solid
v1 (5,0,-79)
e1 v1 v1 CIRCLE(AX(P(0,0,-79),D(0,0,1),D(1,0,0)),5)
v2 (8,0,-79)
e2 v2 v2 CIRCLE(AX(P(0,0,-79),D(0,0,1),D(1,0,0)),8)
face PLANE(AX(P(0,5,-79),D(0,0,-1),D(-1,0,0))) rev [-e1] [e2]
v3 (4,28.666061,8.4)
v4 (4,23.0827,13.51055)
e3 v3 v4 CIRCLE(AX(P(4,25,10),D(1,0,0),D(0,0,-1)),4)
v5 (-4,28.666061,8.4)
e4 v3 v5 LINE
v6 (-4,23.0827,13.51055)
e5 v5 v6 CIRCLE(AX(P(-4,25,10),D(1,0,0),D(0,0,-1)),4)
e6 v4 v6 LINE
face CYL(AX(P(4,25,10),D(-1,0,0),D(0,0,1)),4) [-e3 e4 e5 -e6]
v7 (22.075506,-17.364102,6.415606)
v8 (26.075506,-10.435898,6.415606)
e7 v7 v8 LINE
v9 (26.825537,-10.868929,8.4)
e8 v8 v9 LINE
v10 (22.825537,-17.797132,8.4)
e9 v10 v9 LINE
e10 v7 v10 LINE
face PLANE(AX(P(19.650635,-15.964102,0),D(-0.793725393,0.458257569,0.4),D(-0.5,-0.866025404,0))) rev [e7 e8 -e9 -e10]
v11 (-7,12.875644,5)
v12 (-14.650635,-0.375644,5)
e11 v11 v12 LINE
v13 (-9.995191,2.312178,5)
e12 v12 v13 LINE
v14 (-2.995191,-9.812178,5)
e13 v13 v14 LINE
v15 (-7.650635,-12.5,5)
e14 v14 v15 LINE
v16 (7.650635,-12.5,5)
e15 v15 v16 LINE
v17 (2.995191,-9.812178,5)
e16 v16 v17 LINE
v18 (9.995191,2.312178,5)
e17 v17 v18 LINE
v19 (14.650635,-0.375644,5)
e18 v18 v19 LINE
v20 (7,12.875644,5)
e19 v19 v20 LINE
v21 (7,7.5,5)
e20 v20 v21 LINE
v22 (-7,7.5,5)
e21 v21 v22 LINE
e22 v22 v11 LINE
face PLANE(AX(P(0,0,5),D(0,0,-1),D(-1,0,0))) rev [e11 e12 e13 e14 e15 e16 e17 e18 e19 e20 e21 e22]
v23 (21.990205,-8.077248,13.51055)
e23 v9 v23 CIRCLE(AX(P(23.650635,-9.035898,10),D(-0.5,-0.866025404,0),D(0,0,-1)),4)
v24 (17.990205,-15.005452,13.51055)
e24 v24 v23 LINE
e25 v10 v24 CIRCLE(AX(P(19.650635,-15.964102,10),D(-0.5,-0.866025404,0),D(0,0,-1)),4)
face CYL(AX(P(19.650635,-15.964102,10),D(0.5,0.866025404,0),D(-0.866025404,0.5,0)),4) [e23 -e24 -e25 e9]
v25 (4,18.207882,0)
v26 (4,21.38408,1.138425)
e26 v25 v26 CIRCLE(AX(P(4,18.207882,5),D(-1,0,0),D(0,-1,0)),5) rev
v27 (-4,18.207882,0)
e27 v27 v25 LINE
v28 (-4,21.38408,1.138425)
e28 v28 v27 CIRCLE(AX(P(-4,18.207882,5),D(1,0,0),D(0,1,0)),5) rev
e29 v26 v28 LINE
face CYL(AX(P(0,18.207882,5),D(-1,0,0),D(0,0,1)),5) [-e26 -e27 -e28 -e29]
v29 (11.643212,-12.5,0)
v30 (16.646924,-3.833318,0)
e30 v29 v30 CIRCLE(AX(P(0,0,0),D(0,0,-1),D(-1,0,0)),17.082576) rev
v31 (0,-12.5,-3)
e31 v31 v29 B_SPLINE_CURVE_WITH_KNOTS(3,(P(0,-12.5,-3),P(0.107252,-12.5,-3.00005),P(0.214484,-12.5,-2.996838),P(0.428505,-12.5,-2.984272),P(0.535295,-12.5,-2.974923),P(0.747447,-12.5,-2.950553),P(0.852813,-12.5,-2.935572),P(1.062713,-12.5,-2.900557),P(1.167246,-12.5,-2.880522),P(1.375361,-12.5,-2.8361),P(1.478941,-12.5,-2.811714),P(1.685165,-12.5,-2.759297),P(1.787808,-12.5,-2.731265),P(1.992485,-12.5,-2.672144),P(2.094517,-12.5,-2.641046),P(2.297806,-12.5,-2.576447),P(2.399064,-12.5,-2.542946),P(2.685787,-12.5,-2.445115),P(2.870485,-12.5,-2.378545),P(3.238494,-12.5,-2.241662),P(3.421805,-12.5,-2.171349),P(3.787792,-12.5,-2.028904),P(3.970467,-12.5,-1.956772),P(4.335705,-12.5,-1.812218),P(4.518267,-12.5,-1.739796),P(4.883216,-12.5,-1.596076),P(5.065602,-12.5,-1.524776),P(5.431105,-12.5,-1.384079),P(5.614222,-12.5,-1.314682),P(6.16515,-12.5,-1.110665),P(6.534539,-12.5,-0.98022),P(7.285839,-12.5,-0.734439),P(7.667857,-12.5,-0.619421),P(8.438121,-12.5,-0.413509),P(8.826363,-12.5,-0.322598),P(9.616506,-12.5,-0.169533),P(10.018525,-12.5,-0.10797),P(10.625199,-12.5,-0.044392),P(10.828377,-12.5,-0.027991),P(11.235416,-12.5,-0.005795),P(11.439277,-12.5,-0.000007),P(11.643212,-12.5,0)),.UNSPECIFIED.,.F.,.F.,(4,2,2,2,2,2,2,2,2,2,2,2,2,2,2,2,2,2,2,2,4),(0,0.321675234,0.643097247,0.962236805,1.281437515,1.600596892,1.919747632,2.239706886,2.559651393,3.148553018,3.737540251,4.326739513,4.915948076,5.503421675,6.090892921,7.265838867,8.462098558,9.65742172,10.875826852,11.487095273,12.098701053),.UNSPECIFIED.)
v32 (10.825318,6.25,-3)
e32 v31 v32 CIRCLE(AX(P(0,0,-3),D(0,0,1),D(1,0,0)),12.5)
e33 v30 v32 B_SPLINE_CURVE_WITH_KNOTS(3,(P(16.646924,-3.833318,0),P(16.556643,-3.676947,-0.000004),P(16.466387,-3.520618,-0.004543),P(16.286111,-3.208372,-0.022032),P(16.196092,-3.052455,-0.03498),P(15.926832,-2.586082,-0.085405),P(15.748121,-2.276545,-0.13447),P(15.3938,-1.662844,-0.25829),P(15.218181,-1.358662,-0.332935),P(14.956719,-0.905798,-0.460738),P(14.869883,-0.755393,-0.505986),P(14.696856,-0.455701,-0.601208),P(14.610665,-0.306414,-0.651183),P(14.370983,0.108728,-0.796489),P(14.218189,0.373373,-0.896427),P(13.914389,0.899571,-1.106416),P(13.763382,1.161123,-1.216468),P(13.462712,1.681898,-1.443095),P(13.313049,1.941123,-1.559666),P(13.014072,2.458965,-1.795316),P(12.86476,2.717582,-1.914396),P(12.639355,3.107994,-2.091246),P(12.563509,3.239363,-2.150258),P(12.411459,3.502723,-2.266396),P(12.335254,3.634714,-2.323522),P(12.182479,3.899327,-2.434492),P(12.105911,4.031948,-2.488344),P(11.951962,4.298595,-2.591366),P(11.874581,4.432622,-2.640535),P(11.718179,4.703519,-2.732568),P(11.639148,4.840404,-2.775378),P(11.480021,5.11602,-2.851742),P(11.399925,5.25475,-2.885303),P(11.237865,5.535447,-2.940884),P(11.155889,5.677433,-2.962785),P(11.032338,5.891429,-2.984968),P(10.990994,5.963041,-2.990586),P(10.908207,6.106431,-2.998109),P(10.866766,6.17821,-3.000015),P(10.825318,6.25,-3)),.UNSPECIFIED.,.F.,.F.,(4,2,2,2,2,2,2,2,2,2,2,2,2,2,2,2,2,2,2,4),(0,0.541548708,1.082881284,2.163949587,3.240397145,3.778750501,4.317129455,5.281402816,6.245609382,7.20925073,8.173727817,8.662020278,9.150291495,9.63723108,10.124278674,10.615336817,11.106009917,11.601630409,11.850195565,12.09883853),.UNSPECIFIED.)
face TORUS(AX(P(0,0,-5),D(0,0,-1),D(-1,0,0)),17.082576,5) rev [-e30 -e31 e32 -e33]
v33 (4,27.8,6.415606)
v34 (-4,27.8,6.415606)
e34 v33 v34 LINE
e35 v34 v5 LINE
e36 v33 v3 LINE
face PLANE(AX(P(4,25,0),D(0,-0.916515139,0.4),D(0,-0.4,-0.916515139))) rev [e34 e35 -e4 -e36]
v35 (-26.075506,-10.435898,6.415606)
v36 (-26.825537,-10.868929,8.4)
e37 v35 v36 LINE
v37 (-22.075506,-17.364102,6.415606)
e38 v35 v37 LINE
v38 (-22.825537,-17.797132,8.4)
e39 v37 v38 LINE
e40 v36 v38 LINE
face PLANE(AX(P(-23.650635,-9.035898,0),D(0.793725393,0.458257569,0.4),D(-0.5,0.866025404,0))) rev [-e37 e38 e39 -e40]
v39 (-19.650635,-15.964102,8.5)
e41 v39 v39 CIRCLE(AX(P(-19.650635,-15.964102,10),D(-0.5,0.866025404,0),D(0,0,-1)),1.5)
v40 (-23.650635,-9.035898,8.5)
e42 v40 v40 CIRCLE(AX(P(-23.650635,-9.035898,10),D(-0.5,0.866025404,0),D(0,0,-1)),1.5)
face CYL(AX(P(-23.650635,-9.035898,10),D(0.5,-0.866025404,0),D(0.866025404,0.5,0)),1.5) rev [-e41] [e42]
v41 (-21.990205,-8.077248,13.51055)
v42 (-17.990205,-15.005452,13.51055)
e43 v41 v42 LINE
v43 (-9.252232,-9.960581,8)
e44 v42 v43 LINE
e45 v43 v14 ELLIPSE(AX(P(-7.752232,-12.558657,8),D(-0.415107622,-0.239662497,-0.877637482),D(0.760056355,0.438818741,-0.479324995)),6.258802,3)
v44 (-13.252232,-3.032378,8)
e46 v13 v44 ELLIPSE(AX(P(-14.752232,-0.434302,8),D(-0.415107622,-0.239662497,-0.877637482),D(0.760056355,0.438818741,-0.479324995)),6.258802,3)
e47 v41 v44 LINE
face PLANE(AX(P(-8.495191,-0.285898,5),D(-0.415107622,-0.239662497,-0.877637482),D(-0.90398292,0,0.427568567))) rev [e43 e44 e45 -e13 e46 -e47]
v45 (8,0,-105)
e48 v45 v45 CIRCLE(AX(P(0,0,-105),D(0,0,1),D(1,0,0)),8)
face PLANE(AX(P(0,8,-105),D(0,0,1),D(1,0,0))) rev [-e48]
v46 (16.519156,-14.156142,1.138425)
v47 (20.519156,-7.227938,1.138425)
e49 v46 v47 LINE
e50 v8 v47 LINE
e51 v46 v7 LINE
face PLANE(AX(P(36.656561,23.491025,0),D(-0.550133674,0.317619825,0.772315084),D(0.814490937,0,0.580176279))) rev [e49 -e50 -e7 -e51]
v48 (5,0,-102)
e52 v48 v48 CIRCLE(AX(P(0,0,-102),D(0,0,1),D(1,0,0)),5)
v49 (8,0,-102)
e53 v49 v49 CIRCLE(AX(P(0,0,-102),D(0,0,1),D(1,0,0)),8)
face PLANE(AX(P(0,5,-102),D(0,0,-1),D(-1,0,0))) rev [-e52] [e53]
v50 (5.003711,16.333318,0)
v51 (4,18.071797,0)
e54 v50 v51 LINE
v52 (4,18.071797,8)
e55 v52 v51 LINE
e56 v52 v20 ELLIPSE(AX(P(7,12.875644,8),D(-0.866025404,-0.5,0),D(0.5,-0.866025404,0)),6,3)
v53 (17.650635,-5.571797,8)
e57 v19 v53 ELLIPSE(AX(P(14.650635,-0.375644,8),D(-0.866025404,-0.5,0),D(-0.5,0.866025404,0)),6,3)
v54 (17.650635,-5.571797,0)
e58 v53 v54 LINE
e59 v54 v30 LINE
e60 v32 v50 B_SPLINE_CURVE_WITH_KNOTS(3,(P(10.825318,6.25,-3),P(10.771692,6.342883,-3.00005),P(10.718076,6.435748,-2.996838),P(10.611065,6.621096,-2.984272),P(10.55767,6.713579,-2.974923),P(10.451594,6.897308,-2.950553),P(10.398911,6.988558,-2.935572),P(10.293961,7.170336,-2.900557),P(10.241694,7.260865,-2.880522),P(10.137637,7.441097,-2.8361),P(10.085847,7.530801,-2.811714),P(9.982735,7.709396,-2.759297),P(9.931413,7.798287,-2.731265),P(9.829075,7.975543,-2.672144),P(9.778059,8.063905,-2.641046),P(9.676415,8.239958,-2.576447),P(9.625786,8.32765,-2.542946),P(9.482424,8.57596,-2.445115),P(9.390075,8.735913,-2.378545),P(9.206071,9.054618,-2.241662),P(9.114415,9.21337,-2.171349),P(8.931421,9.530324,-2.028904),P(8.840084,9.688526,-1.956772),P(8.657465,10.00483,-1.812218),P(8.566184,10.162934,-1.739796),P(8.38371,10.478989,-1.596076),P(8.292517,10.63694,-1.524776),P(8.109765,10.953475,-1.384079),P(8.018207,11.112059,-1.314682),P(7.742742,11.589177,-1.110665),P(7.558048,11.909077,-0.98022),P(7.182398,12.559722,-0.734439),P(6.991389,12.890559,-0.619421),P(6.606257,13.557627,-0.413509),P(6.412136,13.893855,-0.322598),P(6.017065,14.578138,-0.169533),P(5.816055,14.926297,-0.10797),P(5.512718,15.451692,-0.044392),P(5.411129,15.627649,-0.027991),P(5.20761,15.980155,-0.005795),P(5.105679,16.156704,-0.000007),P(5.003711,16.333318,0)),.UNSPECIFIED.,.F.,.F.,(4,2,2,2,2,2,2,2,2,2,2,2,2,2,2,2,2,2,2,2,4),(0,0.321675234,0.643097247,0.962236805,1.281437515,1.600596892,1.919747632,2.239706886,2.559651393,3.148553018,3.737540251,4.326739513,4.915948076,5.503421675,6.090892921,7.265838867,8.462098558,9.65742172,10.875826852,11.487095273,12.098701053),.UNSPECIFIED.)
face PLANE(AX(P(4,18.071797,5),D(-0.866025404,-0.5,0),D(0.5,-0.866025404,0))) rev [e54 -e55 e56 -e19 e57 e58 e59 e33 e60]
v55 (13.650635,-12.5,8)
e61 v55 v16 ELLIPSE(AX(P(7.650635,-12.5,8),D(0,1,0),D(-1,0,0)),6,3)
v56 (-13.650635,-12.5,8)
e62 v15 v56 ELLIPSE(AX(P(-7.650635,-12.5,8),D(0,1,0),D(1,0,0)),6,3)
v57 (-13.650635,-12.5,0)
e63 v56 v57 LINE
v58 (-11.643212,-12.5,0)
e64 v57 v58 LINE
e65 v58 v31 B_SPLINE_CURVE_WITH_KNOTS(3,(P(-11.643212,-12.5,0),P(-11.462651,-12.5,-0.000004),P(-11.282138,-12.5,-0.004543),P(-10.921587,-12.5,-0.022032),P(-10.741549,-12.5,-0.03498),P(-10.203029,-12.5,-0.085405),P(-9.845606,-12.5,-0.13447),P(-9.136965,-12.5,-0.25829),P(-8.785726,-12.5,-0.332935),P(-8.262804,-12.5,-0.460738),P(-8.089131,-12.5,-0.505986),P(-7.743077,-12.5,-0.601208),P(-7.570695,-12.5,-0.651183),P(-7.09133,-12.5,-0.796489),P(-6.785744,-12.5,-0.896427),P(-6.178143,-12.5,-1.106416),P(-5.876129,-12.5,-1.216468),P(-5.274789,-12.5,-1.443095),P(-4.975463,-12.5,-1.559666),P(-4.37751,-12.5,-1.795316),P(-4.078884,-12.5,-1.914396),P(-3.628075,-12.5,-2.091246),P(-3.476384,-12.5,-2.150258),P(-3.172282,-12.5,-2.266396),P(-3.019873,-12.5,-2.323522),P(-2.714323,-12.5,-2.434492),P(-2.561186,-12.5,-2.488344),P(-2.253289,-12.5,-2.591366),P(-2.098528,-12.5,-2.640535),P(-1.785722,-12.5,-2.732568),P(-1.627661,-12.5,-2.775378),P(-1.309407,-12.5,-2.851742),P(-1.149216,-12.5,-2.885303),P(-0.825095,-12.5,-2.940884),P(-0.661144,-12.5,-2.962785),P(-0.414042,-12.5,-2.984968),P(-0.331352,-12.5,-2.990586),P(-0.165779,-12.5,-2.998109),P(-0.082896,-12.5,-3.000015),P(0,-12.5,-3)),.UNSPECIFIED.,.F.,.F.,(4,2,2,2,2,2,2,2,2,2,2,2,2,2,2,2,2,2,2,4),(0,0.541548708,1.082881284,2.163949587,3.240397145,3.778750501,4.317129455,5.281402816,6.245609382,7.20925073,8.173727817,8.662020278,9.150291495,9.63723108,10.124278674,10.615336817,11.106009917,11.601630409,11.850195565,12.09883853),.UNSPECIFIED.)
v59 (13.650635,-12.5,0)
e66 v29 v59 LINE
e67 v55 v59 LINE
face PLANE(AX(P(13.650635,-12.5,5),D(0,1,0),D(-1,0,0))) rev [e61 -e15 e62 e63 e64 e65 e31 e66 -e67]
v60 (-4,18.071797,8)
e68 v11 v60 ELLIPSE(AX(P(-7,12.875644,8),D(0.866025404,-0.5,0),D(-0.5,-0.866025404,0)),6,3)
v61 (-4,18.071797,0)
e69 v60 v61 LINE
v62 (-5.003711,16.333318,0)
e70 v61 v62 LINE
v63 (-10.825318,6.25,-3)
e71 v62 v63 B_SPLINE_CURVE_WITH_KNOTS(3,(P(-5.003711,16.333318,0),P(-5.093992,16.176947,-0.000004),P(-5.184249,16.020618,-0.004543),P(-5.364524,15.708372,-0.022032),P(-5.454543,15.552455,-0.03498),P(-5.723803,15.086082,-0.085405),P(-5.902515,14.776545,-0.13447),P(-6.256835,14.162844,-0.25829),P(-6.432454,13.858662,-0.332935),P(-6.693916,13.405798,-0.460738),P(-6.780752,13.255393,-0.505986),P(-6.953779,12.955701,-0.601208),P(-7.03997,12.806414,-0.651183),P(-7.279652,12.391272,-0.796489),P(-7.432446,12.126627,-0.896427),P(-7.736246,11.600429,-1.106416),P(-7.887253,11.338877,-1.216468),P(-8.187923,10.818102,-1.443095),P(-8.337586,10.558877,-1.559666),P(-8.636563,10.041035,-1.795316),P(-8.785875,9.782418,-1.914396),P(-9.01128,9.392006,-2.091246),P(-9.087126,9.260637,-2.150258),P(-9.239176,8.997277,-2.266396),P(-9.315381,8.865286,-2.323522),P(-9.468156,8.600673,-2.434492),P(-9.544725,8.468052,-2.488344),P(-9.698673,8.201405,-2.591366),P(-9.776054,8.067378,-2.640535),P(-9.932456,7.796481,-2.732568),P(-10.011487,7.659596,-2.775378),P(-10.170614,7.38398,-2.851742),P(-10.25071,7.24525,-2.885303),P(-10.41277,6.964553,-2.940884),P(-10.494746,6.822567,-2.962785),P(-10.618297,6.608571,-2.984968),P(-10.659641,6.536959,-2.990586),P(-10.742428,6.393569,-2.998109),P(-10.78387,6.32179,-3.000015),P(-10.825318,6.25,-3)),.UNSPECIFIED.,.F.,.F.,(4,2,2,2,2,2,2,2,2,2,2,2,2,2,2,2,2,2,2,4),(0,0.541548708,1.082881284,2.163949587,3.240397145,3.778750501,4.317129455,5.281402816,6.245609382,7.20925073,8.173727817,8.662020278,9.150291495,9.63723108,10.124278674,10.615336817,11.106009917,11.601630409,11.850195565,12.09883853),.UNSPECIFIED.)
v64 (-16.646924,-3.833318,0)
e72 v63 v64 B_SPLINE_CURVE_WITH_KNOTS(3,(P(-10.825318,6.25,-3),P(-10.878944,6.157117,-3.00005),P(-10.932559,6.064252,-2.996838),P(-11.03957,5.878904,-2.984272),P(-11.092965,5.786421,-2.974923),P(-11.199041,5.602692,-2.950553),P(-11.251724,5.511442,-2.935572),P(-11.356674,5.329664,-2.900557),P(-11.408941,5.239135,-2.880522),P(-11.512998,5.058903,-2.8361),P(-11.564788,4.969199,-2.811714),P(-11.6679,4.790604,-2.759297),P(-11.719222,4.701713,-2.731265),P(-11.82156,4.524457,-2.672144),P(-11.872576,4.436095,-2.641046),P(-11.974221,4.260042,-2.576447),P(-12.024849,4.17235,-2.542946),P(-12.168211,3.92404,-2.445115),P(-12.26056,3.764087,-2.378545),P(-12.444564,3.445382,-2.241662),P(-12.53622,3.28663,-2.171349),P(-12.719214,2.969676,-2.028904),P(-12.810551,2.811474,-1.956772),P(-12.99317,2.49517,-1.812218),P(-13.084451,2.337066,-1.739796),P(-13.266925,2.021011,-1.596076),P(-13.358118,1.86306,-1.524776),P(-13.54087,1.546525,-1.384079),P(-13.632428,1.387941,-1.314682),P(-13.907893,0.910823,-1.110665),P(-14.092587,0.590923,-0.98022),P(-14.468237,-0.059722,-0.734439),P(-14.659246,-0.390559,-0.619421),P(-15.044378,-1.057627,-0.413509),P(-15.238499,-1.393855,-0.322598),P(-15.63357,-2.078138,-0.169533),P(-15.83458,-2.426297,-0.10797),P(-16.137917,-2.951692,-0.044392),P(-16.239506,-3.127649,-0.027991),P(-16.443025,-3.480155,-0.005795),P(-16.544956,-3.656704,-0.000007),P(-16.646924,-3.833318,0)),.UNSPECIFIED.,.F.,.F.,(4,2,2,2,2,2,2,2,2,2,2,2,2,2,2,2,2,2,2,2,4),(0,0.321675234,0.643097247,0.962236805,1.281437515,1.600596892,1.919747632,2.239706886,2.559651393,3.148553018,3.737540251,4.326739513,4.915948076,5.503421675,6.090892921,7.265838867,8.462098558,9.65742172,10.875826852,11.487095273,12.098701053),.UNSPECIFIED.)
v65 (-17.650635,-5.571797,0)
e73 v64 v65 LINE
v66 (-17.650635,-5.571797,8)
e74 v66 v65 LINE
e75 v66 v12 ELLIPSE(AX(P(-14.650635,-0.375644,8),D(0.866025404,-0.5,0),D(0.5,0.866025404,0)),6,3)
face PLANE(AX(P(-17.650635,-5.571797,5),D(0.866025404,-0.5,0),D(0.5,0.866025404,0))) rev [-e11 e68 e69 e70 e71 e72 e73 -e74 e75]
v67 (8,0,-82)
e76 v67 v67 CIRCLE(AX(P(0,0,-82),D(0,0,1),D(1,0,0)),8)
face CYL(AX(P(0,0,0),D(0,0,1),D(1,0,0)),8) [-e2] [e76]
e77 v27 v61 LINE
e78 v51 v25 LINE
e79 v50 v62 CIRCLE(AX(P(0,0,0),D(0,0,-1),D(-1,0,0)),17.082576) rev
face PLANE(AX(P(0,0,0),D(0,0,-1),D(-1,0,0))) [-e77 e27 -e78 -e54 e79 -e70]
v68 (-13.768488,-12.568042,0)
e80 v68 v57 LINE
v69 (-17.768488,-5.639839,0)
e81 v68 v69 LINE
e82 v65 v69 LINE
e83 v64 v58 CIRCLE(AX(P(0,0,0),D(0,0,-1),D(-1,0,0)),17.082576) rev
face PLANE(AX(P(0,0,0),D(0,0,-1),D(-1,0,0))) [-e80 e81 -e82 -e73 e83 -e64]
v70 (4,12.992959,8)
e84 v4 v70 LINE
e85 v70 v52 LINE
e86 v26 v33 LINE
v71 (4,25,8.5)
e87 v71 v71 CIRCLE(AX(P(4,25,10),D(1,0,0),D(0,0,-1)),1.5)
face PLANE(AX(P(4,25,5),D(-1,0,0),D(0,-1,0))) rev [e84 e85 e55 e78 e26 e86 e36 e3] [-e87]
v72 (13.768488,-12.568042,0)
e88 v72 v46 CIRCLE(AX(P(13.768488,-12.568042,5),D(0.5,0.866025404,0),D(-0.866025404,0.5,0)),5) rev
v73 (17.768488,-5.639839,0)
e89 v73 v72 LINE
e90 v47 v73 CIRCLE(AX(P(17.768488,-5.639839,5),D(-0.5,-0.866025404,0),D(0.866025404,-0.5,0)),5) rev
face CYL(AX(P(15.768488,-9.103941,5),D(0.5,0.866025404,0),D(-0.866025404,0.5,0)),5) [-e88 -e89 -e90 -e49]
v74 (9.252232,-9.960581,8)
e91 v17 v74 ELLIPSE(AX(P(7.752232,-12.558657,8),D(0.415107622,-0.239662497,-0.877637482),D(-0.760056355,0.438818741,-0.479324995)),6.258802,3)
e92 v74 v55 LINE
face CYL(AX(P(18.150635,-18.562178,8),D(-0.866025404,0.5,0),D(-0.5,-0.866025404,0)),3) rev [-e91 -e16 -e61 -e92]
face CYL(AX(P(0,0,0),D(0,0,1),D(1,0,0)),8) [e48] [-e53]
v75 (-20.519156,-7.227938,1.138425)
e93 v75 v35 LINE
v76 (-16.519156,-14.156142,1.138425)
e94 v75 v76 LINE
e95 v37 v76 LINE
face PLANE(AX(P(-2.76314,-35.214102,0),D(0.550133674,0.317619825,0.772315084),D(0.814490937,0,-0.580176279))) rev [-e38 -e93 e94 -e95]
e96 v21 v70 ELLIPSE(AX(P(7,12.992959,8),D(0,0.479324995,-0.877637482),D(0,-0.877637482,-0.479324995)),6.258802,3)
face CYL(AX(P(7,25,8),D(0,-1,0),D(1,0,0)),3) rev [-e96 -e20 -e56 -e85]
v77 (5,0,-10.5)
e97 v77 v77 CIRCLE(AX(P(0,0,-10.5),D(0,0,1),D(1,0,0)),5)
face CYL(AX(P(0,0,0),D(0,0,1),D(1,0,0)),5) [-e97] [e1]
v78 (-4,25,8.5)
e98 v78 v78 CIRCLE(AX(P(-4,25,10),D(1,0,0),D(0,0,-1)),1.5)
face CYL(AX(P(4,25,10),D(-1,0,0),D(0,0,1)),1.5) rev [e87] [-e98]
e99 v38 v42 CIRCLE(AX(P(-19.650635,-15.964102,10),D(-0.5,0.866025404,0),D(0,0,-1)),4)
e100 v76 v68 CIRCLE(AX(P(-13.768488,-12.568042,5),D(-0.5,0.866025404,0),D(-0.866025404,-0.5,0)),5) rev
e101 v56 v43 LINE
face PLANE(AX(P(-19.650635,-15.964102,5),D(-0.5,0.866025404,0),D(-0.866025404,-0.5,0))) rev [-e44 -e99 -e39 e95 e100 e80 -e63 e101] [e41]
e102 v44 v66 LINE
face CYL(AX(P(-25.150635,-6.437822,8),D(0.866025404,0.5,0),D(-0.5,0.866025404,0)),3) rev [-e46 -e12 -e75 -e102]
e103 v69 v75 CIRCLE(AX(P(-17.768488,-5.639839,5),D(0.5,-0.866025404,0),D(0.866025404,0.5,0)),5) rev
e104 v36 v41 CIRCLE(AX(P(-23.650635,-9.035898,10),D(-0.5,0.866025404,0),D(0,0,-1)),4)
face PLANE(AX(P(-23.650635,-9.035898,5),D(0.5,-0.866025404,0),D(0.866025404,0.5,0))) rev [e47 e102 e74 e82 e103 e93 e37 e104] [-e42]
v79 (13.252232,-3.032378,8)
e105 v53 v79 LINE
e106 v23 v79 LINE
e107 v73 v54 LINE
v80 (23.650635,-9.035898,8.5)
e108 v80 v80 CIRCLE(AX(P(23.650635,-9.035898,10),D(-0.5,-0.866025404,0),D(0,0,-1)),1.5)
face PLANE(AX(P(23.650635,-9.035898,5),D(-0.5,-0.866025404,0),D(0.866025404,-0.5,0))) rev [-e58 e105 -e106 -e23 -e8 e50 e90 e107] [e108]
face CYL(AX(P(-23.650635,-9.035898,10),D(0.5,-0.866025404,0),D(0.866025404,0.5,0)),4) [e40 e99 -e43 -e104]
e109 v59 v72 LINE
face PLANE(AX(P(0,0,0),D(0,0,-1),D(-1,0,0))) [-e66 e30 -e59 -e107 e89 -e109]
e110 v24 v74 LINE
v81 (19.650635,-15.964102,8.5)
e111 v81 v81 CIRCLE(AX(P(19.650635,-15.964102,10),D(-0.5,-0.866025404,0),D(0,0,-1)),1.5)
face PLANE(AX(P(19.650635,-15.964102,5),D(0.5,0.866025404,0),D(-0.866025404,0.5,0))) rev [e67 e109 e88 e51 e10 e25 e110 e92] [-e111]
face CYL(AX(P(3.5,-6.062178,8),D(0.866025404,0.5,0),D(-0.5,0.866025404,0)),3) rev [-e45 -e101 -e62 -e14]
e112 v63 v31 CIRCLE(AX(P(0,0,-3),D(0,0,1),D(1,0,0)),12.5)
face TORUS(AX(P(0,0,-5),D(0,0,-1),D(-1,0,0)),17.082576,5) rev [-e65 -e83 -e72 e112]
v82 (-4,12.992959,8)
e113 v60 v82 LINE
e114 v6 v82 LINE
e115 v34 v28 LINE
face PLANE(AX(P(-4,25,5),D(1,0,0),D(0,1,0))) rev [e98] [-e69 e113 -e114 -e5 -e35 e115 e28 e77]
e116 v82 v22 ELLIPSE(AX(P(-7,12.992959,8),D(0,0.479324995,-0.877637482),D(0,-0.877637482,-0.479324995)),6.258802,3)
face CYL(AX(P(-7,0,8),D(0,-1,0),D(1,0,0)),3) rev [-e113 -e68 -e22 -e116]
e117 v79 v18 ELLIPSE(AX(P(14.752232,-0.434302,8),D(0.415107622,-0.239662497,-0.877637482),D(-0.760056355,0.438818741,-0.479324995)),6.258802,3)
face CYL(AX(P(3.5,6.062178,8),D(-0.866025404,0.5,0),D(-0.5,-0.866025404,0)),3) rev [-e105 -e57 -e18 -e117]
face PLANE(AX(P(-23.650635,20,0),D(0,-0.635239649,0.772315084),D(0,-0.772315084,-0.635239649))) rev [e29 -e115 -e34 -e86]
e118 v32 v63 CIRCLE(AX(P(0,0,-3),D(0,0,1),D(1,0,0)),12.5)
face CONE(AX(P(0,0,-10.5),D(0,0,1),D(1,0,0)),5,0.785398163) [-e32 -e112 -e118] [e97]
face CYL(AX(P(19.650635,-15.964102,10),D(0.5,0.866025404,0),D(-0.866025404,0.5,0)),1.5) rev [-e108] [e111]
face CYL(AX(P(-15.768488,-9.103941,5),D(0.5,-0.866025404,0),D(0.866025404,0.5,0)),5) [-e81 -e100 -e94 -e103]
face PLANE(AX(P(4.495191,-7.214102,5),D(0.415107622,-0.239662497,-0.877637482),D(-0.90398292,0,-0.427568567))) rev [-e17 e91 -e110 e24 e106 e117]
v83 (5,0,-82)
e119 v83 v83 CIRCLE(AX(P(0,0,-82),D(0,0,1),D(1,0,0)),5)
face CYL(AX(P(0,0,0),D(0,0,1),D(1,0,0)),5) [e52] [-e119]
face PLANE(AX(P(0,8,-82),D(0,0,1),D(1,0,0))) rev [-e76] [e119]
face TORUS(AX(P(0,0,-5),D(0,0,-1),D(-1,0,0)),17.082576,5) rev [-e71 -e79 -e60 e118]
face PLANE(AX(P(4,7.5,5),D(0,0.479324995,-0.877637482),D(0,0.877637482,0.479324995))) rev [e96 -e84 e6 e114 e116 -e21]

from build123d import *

# Parameters (mm, degrees)
EXTRUDE_1_DEPTH          = 5
SKETCH_3_R               = 1.5
EXTRUDE_2_DEPTH          = 4
CUT_EXTRUDE_1_DEPTH      = 112.469065397
PATTERN_CIRCULAR_1_COUNT = 3
FILLET_1_R               = 3
FILLET_2_R               = 5


with BuildPart() as part:
    # 草图1 → 旋转1 (revolve)
    with BuildSketch(Plane(origin=(0, 0, 0), x_dir=(0, 0, -1), z_dir=(1, 0, 0)), mode=Mode.PRIVATE) as revolve_1_sk:
        Polygon((0, 0), (0, 12.5), (3, 12.5), (10.5, 5), (79, 5), (79, 8), (82, 8), (82, 5), (102, 5), (102, 8), (105, 8), (105, 0), align=None)
    revolve(revolve_1_sk.sketch.rotate(Axis((0, 0, 0), (0, 0, -1)), 90), axis=Axis((0, 0, 0), (0, 0, -1)))

    # 草图2 → 凸台-拉伸1 (add)
    with BuildSketch(Plane.XY):
        Polygon((-4, 25), (4, 25), (4, 18.07179677), (17.650635095, -5.57179677), (23.650635095, -9.035898385), (19.650635095, -15.964101615), (13.650635095, -12.5), (-13.650635095, -12.5), (-19.650635095, -15.964101615), (-23.650635095, -9.035898385), (-17.650635095, -5.57179677), (-4, 18.07179677), align=None)
    extrude(amount=EXTRUDE_1_DEPTH)

    # 草图3 → 凸台-拉伸2 (add, symmetric)
    with BuildSketch(Plane(origin=(0, 0, 0), x_dir=(0, 0, -1), z_dir=(1, 0, 0))):
        with BuildLine():
            Line((-5, 7.5), (-13.510549927, 23.082700021))
            ThreePointArc((-13.510549927, 23.082700021), (-12.95059807, 27.700735275), (-8.4, 28.666060556))
            Line((-8.4, 28.666060556), (0, 25))
            Line((0, 25), (-5, 25))
            Line((-5, 25), (-5, 7.5))
        make_face()
        with Locations((-10, 25)):
            Circle(SKETCH_3_R, mode=Mode.SUBTRACT)
    extrude_2 = extrude(amount=EXTRUDE_2_DEPTH, both=True)

    # 草图5 → 切除-拉伸1 (cut, symmetric)
    with BuildSketch(Plane(origin=(0, 0, 0), x_dir=(0, 0, -1), z_dir=(1, 0, 0))):
        Polygon((0, 20), (-6.415605973, 27.8), (0, 25), align=None)
    cut_extrude_1 = extrude(amount=CUT_EXTRUDE_1_DEPTH, both=True, mode=Mode.SUBTRACT)

    # 阵列(圆周)1: 凸台-拉伸2, 切除-拉伸1 ×3 about axis
    pattern_circular_1_axis = Axis((0, 0, 0), (0, 0, 1))
    add([extrude_2.rotate(pattern_circular_1_axis, i * 360 / PATTERN_CIRCULAR_1_COUNT) for i in range(1, PATTERN_CIRCULAR_1_COUNT)])
    add([cut_extrude_1.rotate(pattern_circular_1_axis, i * 360 / PATTERN_CIRCULAR_1_COUNT) for i in range(1, PATTERN_CIRCULAR_1_COUNT)], mode=Mode.SUBTRACT)

    # 圆角1
    # the kernel refuses this fillet: 3 mm, written as the material it adds along each edge
    with BuildSketch(Plane(origin=(20.145825623, -16.25, 5), x_dir=(0, 0, 1), z_dir=(-0.8660254037844384, 0.5000000000000004, 0))) as fillet_1_piece_1_section:
        with BuildLine():
            CenterArc((FILLET_1_R, -FILLET_1_R), FILLET_1_R, 90, 90)
            Line((0, -FILLET_1_R), (0, 0))
            Line((0, 0), (FILLET_1_R, 0))
        make_face()
    fillet_1_piece_1 = extrude(amount=25.57179677, mode=Mode.PRIVATE)
    fillet_1_piece_1 = split(fillet_1_piece_1, bisect_by=Plane(origin=(20.145825623, -12.5, 5), z_dir=(0, 1, 0)), keep=Keep.TOP, mode=Mode.PRIVATE)
    fillet_1_piece_1 = split(fillet_1_piece_1, bisect_by=Plane(origin=(16.550053856, -14.173980202, 12.602327469), z_dir=(0.4151076221534179, -0.23966249739294157, -0.877637481750588)), keep=Keep.TOP, mode=Mode.PRIVATE)
    add(fillet_1_piece_1)
    with BuildSketch(Plane(origin=(24.145825623, -9.32179677, 5), x_dir=(0, 0, 1), z_dir=(-0.8660254037844384, 0.5000000000000004, 0))) as fillet_1_piece_2_section:
        with BuildLine():
            CenterArc((FILLET_1_R, FILLET_1_R), FILLET_1_R, 180, 90)
            Line((0, FILLET_1_R), (0, 0))
            Line((0, 0), (FILLET_1_R, 0))
        make_face()
    fillet_1_piece_2 = extrude(amount=25.57179677, mode=Mode.PRIVATE)
    fillet_1_piece_2 = split(fillet_1_piece_2, bisect_by=Plane(origin=(20.550053856, -7.245776972, 12.602327469), z_dir=(0.4151076221534179, -0.23966249739294157, -0.877637481750588)), keep=Keep.TOP, mode=Mode.PRIVATE)
    fillet_1_piece_2 = split(fillet_1_piece_2, bisect_by=Plane(origin=(20.898230359, -11.19679677, 5), z_dir=(-0.8660254037844386, -0.5000000000000001, 0)), keep=Keep.TOP, mode=Mode.PRIVATE)
    add(fillet_1_piece_2)
    with BuildSketch(Plane(origin=(4, 25.57179677, 5), x_dir=(0, 0, 1), z_dir=(0, -1, 0))) as fillet_1_piece_3_section:
        with BuildLine():
            CenterArc((FILLET_1_R, -FILLET_1_R), FILLET_1_R, 90, 90)
            Line((0, -FILLET_1_R), (0, 0))
            Line((0, 0), (FILLET_1_R, 0))
        make_face()
    fillet_1_piece_3 = extrude(amount=25.57179677, mode=Mode.PRIVATE)
    fillet_1_piece_3 = split(fillet_1_piece_3, bisect_by=Plane(origin=(0.752404736, 23.69679677, 5), z_dir=(-0.8660254037844386, -0.5000000000000001, 0)), keep=Keep.TOP, mode=Mode.PRIVATE)
    fillet_1_piece_3 = split(fillet_1_piece_3, bisect_by=Plane(origin=(4, 21.419757175, 12.602327469), z_dir=(0, 0.4793249947858827, -0.877637481750588)), keep=Keep.TOP, mode=Mode.PRIVATE)
    add(fillet_1_piece_3)
    with BuildSketch(Plane(origin=(-4, 25.57179677, 5), x_dir=(0, 0, 1), z_dir=(0, -1, 0))) as fillet_1_piece_4_section:
        with BuildLine():
            CenterArc((FILLET_1_R, FILLET_1_R), FILLET_1_R, 180, 90)
            Line((0, FILLET_1_R), (0, 0))
            Line((0, 0), (FILLET_1_R, 0))
        make_face()
    fillet_1_piece_4 = extrude(amount=25.57179677, mode=Mode.PRIVATE)
    fillet_1_piece_4 = split(fillet_1_piece_4, bisect_by=Plane(origin=(-0.752404736, 23.69679677, 5), z_dir=(0.8660254037844388, -0.4999999999999999, 0)), keep=Keep.TOP, mode=Mode.PRIVATE)
    fillet_1_piece_4 = split(fillet_1_piece_4, bisect_by=Plane(origin=(-4, 21.419757175, 12.602327469), z_dir=(0, 0.4793249947858827, -0.877637481750588)), keep=Keep.TOP, mode=Mode.PRIVATE)
    add(fillet_1_piece_4)
    with BuildSketch(Plane(origin=(-24.145825623, -9.32179677, 5), x_dir=(0, 0, 1), z_dir=(0.8660254037844388, 0.49999999999999983, 0))) as fillet_1_piece_5_section:
        with BuildLine():
            CenterArc((FILLET_1_R, -FILLET_1_R), FILLET_1_R, 90, 90)
            Line((0, -FILLET_1_R), (0, 0))
            Line((0, 0), (FILLET_1_R, 0))
        make_face()
    fillet_1_piece_5 = extrude(amount=25.57179677, mode=Mode.PRIVATE)
    fillet_1_piece_5 = split(fillet_1_piece_5, bisect_by=Plane(origin=(-20.898230359, -11.19679677, 5), z_dir=(0.8660254037844388, -0.4999999999999999, 0)), keep=Keep.TOP, mode=Mode.PRIVATE)
    fillet_1_piece_5 = split(fillet_1_piece_5, bisect_by=Plane(origin=(-20.550053856, -7.245776972, 12.602327469), z_dir=(-0.4151076221534181, -0.23966249739294126, -0.8776374817505879)), keep=Keep.TOP, mode=Mode.PRIVATE)
    add(fillet_1_piece_5)
    with BuildSketch(Plane(origin=(-20.145825623, -16.25, 5), x_dir=(0, 0, 1), z_dir=(0.8660254037844388, 0.49999999999999983, 0))) as fillet_1_piece_6_section:
        with BuildLine():
            CenterArc((FILLET_1_R, FILLET_1_R), FILLET_1_R, 180, 90)
            Line((0, FILLET_1_R), (0, 0))
            Line((0, 0), (FILLET_1_R, 0))
        make_face()
    fillet_1_piece_6 = extrude(amount=25.57179677, mode=Mode.PRIVATE)
    fillet_1_piece_6 = split(fillet_1_piece_6, bisect_by=Plane(origin=(-20.145825623, -12.5, 5), z_dir=(0, 1, 0)), keep=Keep.TOP, mode=Mode.PRIVATE)
    fillet_1_piece_6 = split(fillet_1_piece_6, bisect_by=Plane(origin=(-16.550053856, -14.173980202, 12.602327469), z_dir=(-0.4151076221534181, -0.23966249739294126, -0.8776374817505879)), keep=Keep.TOP, mode=Mode.PRIVATE)
    add(fillet_1_piece_6)

    # 圆角2
    # the kernel refuses this fillet: 5 mm, written as the material it adds along each edge
    with BuildSketch(Plane(origin=(0, 0, 0), x_dir=(-0.8660253934759007, 0.5000000178549112, 0), z_dir=(-0.5000000178549112, -0.8660253934759007, 0))) as fillet_2_piece_1_section:
        with BuildLine():
            CenterArc((17.082575695, 5), FILLET_2_R, 203.578178478, 66.421821522)
            Line((17.082575695, 0), (12.5, 0))
            Line((12.5, 0), (12.5, 3))
        make_face()
    fillet_2_piece_1 = revolve(axis=Axis((0, 0, 0), (0, 0, -1)), revolution_arc=119.999998782, mode=Mode.PRIVATE)
    fillet_2_piece_1 = split(fillet_2_piece_1, bisect_by=Plane(origin=(-10.825317547, 6.25, 0), z_dir=(0.866025403784329, -0.50000000000019, 0)), keep=Keep.TOP, mode=Mode.PRIVATE)
    fillet_2_piece_1 = split(fillet_2_piece_1, bisect_by=Plane(origin=(10.825317547, 6.25, 0), z_dir=(-0.866025403784329, -0.50000000000019, 0)), keep=Keep.TOP, mode=Mode.PRIVATE)
    add(fillet_2_piece_1)
    with BuildSketch(Plane(origin=(0, 0, 0), x_dir=(3.791753972085742e-09, -1.0, 0), z_dir=(1.0, 3.791753972085742e-09, 0))) as fillet_2_piece_2_section:
        with BuildLine():
            CenterArc((17.082575695, 5), FILLET_2_R, 203.578178478, 66.421821522)
            Line((12.5, 3), (12.5, 0))
            Line((12.5, 0), (17.082575695, 0))
        make_face()
    fillet_2_piece_2 = revolve(axis=Axis((0, 0, 0), (0, 0, -1)), revolution_arc=120.000001399, mode=Mode.PRIVATE)
    fillet_2_piece_2 = split(fillet_2_piece_2, bisect_by=Plane(origin=(-10.825317547, 6.25, 0), z_dir=(0.866025403784329, -0.50000000000019, 0)), keep=Keep.TOP, mode=Mode.PRIVATE)
    fillet_2_piece_2 = split(fillet_2_piece_2, bisect_by=Plane(origin=(0, -12.5, 0), z_dir=(0, 1, 0)), keep=Keep.TOP, mode=Mode.PRIVATE)
    add(fillet_2_piece_2)
    with BuildSketch(Plane(origin=(0, 0, 0), x_dir=(1, 0, 0), z_dir=(0, 1, 0))) as fillet_2_piece_3_section:
        with BuildLine():
            CenterArc((17.082575695, 5), FILLET_2_R, 203.578178478, 66.421821522)
            Line((17.082575695, 0), (12.5, 0))
            Line((12.5, 0), (12.5, 3))
        make_face()
    fillet_2_piece_3 = revolve(axis=Axis((0, 0, 0), (0, 0, -1)), revolution_arc=89.999999783, mode=Mode.PRIVATE)
    fillet_2_piece_3 = split(fillet_2_piece_3, bisect_by=Plane(origin=(10.825317547, 6.25, 0), z_dir=(-0.866025403784329, -0.50000000000019, 0)), keep=Keep.TOP, mode=Mode.PRIVATE)
    fillet_2_piece_3 = split(fillet_2_piece_3, bisect_by=Plane(origin=(0, -12.5, 0), z_dir=(0, 1, 0)), keep=Keep.TOP, mode=Mode.PRIVATE)
    add(fillet_2_piece_3)
    with BuildSketch(Plane(origin=(0, 0, 0), x_dir=(0.8660254034677206, 0.5000000005485719, 0), z_dir=(-0.5000000005485719, 0.8660254034677206, 0))) as fillet_2_piece_4_section:
        with BuildLine():
            CenterArc((17.082575695, 5), FILLET_2_R, 203.578178478, 66.421821522)
            Line((17.082575695, 0), (12.5, 0))
            Line((12.5, 0), (12.5, 3))
        make_face()
    fillet_2_piece_4 = revolve(axis=Axis((0, 0, 0), (0, 0, -1)), revolution_arc=30.000000036, mode=Mode.PRIVATE)
    fillet_2_piece_4 = split(fillet_2_piece_4, bisect_by=Plane(origin=(10.825317547, 6.25, 0), z_dir=(-0.866025403784329, -0.50000000000019, 0)), keep=Keep.TOP, mode=Mode.PRIVATE)
    add(fillet_2_piece_4)
    # the kernel refuses this fillet: 5 mm, written as the material it takes off along each edge
    with BuildSketch(Plane(origin=(-13.080360235, -17.344151491, 0), x_dir=(0.8660254037844387, 0.49999999999999983, 0), z_dir=(-0.49999999999999983, 0.8660254037844388, 0)), Plane(origin=(-8.480295681, 20, 0), x_dir=(0, -1, 0), z_dir=(1, 0, 0))) as fillet_2_2_piece_1:
        with BuildLine():
            CenterArc((FILLET_2_R * 0.358423654455, -FILLET_2_R), FILLET_2_R, 90, 39.437761058)
            Line((-FILLET_2_R * 0.276815994626, -FILLET_2_R * 0.227684916478), (0, 0))
            Line((0, 0), (FILLET_2_R * 0.358423654455, 0))
        make_face()
    extrude(amount=16.960591361, mode=Mode.SUBTRACT)
    with BuildSketch(Plane(origin=(21.560655916, -2.655848509, 0), x_dir=(0.6688444820557844, -0.38615754176090344, 0.6352396490811208), z_dir=(-0.5000000000000004, -0.8660254037844384, 0))) as fillet_2_2_piece_2:
        with BuildLine():
            CenterArc((FILLET_2_R * 0.358423654455, FILLET_2_R), FILLET_2_R, 230.562238942, 39.437761058)
            Line((-FILLET_2_R * 0.276815994626, FILLET_2_R * 0.227684916478), (0, 0))
            Line((0, 0), (FILLET_2_R * 0.358423654455, 0))
        make_face()
    extrude(amount=16.960591361, mode=Mode.SUBTRACT)


solid = part.part
